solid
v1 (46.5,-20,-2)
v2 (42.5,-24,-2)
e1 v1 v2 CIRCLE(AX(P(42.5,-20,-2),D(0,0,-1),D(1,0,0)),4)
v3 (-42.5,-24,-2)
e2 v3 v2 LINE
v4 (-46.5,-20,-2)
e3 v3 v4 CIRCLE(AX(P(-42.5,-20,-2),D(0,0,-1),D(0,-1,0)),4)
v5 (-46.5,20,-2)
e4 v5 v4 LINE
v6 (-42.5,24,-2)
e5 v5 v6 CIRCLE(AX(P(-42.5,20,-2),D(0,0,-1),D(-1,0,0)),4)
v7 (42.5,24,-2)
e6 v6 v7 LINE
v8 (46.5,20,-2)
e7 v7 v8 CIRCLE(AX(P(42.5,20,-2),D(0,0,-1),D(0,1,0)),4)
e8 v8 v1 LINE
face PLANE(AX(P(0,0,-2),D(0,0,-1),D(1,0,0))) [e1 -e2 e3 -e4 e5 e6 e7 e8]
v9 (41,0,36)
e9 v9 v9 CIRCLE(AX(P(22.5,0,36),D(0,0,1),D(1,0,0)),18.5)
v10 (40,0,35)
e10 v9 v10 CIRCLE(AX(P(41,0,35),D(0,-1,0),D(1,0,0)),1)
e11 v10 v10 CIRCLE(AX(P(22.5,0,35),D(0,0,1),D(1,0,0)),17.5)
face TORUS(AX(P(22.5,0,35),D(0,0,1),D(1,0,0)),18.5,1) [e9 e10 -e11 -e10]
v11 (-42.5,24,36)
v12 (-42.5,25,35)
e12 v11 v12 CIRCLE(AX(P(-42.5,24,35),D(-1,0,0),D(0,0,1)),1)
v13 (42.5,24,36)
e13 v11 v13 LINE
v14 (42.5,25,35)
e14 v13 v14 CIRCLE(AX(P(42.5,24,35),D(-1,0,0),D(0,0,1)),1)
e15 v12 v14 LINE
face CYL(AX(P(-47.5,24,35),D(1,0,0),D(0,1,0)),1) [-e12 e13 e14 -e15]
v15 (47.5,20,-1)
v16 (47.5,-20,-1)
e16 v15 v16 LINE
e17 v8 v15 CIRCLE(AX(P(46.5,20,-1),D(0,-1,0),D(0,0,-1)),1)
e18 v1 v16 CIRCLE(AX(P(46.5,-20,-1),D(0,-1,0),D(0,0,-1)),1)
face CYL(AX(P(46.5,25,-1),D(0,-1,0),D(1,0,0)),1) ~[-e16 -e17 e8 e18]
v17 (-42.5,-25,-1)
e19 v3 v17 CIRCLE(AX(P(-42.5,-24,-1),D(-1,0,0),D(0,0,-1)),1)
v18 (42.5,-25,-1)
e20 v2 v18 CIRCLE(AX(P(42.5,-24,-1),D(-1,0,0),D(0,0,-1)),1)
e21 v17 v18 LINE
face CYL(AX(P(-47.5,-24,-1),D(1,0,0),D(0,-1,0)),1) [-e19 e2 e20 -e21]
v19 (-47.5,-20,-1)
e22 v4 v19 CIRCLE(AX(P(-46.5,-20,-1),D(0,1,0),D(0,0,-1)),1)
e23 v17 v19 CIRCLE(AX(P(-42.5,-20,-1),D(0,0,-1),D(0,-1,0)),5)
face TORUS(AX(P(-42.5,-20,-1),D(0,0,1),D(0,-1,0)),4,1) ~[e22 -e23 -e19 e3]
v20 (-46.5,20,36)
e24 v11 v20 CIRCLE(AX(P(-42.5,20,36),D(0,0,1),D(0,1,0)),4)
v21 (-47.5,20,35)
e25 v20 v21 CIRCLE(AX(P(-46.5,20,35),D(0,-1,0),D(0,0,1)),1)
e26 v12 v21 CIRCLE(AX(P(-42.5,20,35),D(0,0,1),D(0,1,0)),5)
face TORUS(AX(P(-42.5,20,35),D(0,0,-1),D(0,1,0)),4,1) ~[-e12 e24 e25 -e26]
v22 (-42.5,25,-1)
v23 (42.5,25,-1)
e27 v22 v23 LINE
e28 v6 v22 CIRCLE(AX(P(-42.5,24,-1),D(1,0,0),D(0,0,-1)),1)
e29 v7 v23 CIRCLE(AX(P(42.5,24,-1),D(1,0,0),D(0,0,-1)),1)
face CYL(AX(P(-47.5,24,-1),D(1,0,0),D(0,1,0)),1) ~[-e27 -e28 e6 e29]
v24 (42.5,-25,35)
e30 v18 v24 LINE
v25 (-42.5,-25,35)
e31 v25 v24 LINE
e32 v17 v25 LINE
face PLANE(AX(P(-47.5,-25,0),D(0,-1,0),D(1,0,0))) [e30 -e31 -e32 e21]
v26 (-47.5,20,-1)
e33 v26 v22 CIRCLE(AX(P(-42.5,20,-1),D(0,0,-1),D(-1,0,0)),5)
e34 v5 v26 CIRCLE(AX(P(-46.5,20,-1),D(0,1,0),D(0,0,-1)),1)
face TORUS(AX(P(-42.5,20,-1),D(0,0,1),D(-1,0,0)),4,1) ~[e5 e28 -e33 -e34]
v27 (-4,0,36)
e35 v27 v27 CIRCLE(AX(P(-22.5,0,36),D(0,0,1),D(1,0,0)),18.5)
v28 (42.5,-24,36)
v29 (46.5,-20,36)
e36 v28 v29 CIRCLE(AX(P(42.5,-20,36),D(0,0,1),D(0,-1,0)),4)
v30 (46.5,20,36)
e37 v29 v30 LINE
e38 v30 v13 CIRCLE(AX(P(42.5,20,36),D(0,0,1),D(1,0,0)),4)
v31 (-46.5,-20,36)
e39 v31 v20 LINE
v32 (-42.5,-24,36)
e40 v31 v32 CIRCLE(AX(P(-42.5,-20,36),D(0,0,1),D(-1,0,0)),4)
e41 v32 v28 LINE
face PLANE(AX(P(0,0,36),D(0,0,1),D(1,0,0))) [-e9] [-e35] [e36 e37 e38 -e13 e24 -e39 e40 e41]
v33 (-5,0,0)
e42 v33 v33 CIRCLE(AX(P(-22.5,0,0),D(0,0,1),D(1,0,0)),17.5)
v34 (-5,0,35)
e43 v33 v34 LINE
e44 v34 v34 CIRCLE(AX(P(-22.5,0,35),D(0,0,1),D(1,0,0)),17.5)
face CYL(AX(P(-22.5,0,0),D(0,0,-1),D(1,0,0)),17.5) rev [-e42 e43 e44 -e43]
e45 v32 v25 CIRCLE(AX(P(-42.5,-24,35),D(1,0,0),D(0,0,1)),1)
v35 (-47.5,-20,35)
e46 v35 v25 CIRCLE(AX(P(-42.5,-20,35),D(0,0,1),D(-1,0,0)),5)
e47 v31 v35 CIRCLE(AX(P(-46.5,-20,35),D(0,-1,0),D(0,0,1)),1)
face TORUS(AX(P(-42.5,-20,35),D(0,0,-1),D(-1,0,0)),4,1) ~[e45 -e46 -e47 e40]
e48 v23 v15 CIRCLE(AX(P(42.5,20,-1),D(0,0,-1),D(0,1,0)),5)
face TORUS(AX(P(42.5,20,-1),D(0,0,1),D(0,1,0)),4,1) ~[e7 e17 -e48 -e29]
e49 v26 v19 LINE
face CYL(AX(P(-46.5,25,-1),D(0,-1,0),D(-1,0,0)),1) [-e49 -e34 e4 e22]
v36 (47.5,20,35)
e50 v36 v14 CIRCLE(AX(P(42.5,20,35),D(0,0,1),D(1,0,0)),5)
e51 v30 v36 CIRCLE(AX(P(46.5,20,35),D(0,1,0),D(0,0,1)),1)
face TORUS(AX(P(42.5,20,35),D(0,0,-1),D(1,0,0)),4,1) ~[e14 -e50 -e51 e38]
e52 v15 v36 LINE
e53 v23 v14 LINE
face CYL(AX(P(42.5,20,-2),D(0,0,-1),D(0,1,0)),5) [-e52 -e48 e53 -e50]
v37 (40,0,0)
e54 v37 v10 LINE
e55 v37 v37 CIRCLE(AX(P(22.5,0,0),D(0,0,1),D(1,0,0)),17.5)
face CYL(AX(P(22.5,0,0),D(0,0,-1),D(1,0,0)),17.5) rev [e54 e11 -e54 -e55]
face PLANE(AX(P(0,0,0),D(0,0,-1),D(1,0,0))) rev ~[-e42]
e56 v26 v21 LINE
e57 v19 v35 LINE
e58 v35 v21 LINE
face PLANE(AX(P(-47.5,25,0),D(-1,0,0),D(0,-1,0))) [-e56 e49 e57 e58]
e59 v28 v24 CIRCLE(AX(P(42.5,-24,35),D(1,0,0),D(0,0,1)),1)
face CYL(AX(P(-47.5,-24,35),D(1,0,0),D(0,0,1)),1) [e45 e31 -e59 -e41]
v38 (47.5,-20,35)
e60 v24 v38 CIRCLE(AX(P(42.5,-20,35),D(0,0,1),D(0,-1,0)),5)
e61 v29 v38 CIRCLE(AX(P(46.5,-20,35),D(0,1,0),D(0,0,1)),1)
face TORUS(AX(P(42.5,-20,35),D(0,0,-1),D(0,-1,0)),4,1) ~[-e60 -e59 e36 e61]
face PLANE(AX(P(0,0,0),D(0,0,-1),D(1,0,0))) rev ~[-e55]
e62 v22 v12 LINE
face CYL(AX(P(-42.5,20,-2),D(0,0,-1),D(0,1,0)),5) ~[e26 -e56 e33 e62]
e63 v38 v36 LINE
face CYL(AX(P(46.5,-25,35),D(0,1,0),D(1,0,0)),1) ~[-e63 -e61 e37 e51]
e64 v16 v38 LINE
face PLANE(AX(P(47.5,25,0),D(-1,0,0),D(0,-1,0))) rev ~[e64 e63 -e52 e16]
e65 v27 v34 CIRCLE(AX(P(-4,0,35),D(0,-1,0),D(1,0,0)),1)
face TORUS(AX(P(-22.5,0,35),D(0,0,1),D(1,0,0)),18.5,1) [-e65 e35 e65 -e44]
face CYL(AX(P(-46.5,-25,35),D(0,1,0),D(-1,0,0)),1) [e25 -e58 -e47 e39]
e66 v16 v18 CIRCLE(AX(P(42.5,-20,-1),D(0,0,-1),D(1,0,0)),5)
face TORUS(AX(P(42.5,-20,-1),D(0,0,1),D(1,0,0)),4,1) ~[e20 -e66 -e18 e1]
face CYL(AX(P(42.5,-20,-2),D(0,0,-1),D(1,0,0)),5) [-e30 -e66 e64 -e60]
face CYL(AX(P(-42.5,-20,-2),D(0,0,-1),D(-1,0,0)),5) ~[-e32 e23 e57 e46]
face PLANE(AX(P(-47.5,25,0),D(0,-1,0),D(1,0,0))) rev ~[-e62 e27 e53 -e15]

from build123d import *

# Parameters (mm, degrees)
F0_W         = 95
F0_H         = 50
F0_R         = 17.5
F1_DEPTH     = 36
F2_W         = 95
F2_H         = 50
F3_DEPTH     = 2
F4_R         = 1
F5_T1_DEPTH  = 38
F5_T4_ANGLE  = 90
F5_T6_ANGLE  = 90
F5_T8_ANGLE  = 90
F5_T10_ANGLE = 90
F5_T12_ANGLE = 90
F5_T14_ANGLE = 90
F5_T16_ANGLE = 90
F5_T18_ANGLE = 90


# Not quite as in the source:
# - a fillet or chamfer that OpenCascade refuses, or shapes differently, is made with other operations: its cross-section is extruded or revolved along the edge and cut away or added


with BuildPart() as f1:
    # F0 (on Top) → F1 (new body)
    with BuildSketch(Plane.XY):
        Rectangle(F0_W, F0_H)
        with Locations((-22.5, 0)):
            Circle(F0_R, mode=Mode.SUBTRACT)
        with Locations((22.5, 0)):
            Circle(F0_R, mode=Mode.SUBTRACT)
    extrude(amount=F1_DEPTH)

    # F2 (on face) → F3 (join)
    with BuildSketch(Plane(origin=(0, 0, 0), x_dir=(1, 0, 0), z_dir=(0, 0, -1))):
        Rectangle(F2_W, F2_H)
    extrude(amount=F3_DEPTH)

    # F4
    f4_edges = [f1.edges().sort_by_distance(p)[0] for p in [
        (0, 25, 36),
        (-47.5, 0, 36),
        (0, -25, 36),
        (47.5, 0, 36),
        (-40, 0, 36),
        (5, 0, 36),
        (0, 25, -2),
        (47.5, 0, -2),
        (0, -25, -2),
        (-47.5, 0, -2),
    ]]
    fillet(f4_edges, radius=F4_R)

    # F5: fillet of radius 5 on 4 edges, made by hand

    # F5_s2 → F5_t1 (cut)
    with BuildSketch(Plane.XY.offset(-2)):
        with BuildLine():
            ThreePointArc((42.5, 25), (46.0355339059, 23.5355339059), (47.5, 20))
            Line((47.5, 20), (47.5, 25))
            Line((47.5, 25), (42.5, 25))
        make_face()
        with BuildLine():
            ThreePointArc((47.5, -20), (46.0355339059, -23.5355339059), (42.5, -25))
            Line((42.5, -25), (47.5, -25))
            Line((47.5, -25), (47.5, -20))
        make_face()
        with BuildLine():
            ThreePointArc((-47.5, -20), (-46.0355339059, -23.5355339059), (-42.5, -25))
            Line((-42.5, -25), (-47.5, -25))
            Line((-47.5, -25), (-47.5, -20))
        make_face()
        with BuildLine():
            ThreePointArc((-42.5, 25), (-46.0355339059, 23.5355339059), (-47.5, 20))
            Line((-47.5, 20), (-47.5, 25))
            Line((-47.5, 25), (-42.5, 25))
        make_face()
    extrude(amount=F5_T1_DEPTH, mode=Mode.SUBTRACT)

    # F5_s3 → F5_t4 (revolve, cut)
    with BuildSketch(Plane.XZ.offset(-20)):
        with BuildLine():
            ThreePointArc((-46.5, -2), (-47.2071067812, -1.7071067812), (-47.5, -1))
            Line((-47.5, -1), (-47.5, -2))
            Line((-47.5, -2), (-46.5, -2))
        make_face()
    revolve(axis=Axis((-42.5, 20, -2), (0, 0, -1)), revolution_arc=F5_T4_ANGLE, mode=Mode.SUBTRACT)

    # F5_s5 → F5_t6 (revolve, cut)
    with BuildSketch(Plane.YZ.offset(-42.5)):
        with BuildLine():
            ThreePointArc((24, 36), (24.7071067812, 35.7071067812), (25, 35))
            Line((25, 35), (25, 36))
            Line((25, 36), (24, 36))
        make_face()
    revolve(axis=Axis((-42.5, 20, 36), (0, 0, 1)), revolution_arc=F5_T6_ANGLE, mode=Mode.SUBTRACT)

    # F5_s7 → F5_t8 (revolve, cut)
    with BuildSketch(Plane.YZ.offset(-42.5)):
        with BuildLine():
            ThreePointArc((-24, -2), (-24.7071067812, -1.7071067812), (-25, -1))
            Line((-25, -1), (-25, -2))
            Line((-25, -2), (-24, -2))
        make_face()
    revolve(axis=Axis((-42.5, -20, -2), (0, 0, -1)), revolution_arc=F5_T8_ANGLE, mode=Mode.SUBTRACT)

    # F5_s9 → F5_t10 (revolve, cut)
    with BuildSketch(Plane.XZ.offset(20)):
        with BuildLine():
            ThreePointArc((-46.5, 36), (-47.2071067812, 35.7071067812), (-47.5, 35))
            Line((-47.5, 35), (-47.5, 36))
            Line((-47.5, 36), (-46.5, 36))
        make_face()
    revolve(axis=Axis((-42.5, -20, 36), (0, 0, 1)), revolution_arc=F5_T10_ANGLE, mode=Mode.SUBTRACT)

    # F5_s11 → F5_t12 (revolve, cut)
    with BuildSketch(Plane.YZ.offset(42.5)):
        with BuildLine():
            ThreePointArc((-24, 36), (-24.7071067812, 35.7071067812), (-25, 35))
            Line((-25, 35), (-25, 36))
            Line((-25, 36), (-24, 36))
        make_face()
    revolve(axis=Axis((42.5, -20, 36), (0, 0, 1)), revolution_arc=F5_T12_ANGLE, mode=Mode.SUBTRACT)

    # F5_s13 → F5_t14 (revolve, cut)
    with BuildSketch(Plane.XZ.offset(20)):
        with BuildLine():
            ThreePointArc((46.5, -2), (47.2071067812, -1.7071067812), (47.5, -1))
            Line((47.5, -1), (47.5, -2))
            Line((47.5, -2), (46.5, -2))
        make_face()
    revolve(axis=Axis((42.5, -20, -2), (0, 0, -1)), revolution_arc=F5_T14_ANGLE, mode=Mode.SUBTRACT)

    # F5_s15 → F5_t16 (revolve, cut)
    with BuildSketch(Plane.XZ.offset(-20)):
        with BuildLine():
            ThreePointArc((46.5, 36), (47.2071067812, 35.7071067812), (47.5, 35))
            Line((47.5, 35), (47.5, 36))
            Line((47.5, 36), (46.5, 36))
        make_face()
    revolve(axis=Axis((42.5, 20, 36), (0, 0, 1)), revolution_arc=F5_T16_ANGLE, mode=Mode.SUBTRACT)

    # F5_s17 → F5_t18 (revolve, cut)
    with BuildSketch(Plane.YZ.offset(42.5)):
        with BuildLine():
            ThreePointArc((24, -2), (24.7071067812, -1.7071067812), (25, -1))
            Line((25, -1), (25, -2))
            Line((25, -2), (24, -2))
        make_face()
    revolve(axis=Axis((42.5, 20, -2), (0, 0, -1)), revolution_arc=F5_T18_ANGLE, mode=Mode.SUBTRACT)


solid = f1.part
